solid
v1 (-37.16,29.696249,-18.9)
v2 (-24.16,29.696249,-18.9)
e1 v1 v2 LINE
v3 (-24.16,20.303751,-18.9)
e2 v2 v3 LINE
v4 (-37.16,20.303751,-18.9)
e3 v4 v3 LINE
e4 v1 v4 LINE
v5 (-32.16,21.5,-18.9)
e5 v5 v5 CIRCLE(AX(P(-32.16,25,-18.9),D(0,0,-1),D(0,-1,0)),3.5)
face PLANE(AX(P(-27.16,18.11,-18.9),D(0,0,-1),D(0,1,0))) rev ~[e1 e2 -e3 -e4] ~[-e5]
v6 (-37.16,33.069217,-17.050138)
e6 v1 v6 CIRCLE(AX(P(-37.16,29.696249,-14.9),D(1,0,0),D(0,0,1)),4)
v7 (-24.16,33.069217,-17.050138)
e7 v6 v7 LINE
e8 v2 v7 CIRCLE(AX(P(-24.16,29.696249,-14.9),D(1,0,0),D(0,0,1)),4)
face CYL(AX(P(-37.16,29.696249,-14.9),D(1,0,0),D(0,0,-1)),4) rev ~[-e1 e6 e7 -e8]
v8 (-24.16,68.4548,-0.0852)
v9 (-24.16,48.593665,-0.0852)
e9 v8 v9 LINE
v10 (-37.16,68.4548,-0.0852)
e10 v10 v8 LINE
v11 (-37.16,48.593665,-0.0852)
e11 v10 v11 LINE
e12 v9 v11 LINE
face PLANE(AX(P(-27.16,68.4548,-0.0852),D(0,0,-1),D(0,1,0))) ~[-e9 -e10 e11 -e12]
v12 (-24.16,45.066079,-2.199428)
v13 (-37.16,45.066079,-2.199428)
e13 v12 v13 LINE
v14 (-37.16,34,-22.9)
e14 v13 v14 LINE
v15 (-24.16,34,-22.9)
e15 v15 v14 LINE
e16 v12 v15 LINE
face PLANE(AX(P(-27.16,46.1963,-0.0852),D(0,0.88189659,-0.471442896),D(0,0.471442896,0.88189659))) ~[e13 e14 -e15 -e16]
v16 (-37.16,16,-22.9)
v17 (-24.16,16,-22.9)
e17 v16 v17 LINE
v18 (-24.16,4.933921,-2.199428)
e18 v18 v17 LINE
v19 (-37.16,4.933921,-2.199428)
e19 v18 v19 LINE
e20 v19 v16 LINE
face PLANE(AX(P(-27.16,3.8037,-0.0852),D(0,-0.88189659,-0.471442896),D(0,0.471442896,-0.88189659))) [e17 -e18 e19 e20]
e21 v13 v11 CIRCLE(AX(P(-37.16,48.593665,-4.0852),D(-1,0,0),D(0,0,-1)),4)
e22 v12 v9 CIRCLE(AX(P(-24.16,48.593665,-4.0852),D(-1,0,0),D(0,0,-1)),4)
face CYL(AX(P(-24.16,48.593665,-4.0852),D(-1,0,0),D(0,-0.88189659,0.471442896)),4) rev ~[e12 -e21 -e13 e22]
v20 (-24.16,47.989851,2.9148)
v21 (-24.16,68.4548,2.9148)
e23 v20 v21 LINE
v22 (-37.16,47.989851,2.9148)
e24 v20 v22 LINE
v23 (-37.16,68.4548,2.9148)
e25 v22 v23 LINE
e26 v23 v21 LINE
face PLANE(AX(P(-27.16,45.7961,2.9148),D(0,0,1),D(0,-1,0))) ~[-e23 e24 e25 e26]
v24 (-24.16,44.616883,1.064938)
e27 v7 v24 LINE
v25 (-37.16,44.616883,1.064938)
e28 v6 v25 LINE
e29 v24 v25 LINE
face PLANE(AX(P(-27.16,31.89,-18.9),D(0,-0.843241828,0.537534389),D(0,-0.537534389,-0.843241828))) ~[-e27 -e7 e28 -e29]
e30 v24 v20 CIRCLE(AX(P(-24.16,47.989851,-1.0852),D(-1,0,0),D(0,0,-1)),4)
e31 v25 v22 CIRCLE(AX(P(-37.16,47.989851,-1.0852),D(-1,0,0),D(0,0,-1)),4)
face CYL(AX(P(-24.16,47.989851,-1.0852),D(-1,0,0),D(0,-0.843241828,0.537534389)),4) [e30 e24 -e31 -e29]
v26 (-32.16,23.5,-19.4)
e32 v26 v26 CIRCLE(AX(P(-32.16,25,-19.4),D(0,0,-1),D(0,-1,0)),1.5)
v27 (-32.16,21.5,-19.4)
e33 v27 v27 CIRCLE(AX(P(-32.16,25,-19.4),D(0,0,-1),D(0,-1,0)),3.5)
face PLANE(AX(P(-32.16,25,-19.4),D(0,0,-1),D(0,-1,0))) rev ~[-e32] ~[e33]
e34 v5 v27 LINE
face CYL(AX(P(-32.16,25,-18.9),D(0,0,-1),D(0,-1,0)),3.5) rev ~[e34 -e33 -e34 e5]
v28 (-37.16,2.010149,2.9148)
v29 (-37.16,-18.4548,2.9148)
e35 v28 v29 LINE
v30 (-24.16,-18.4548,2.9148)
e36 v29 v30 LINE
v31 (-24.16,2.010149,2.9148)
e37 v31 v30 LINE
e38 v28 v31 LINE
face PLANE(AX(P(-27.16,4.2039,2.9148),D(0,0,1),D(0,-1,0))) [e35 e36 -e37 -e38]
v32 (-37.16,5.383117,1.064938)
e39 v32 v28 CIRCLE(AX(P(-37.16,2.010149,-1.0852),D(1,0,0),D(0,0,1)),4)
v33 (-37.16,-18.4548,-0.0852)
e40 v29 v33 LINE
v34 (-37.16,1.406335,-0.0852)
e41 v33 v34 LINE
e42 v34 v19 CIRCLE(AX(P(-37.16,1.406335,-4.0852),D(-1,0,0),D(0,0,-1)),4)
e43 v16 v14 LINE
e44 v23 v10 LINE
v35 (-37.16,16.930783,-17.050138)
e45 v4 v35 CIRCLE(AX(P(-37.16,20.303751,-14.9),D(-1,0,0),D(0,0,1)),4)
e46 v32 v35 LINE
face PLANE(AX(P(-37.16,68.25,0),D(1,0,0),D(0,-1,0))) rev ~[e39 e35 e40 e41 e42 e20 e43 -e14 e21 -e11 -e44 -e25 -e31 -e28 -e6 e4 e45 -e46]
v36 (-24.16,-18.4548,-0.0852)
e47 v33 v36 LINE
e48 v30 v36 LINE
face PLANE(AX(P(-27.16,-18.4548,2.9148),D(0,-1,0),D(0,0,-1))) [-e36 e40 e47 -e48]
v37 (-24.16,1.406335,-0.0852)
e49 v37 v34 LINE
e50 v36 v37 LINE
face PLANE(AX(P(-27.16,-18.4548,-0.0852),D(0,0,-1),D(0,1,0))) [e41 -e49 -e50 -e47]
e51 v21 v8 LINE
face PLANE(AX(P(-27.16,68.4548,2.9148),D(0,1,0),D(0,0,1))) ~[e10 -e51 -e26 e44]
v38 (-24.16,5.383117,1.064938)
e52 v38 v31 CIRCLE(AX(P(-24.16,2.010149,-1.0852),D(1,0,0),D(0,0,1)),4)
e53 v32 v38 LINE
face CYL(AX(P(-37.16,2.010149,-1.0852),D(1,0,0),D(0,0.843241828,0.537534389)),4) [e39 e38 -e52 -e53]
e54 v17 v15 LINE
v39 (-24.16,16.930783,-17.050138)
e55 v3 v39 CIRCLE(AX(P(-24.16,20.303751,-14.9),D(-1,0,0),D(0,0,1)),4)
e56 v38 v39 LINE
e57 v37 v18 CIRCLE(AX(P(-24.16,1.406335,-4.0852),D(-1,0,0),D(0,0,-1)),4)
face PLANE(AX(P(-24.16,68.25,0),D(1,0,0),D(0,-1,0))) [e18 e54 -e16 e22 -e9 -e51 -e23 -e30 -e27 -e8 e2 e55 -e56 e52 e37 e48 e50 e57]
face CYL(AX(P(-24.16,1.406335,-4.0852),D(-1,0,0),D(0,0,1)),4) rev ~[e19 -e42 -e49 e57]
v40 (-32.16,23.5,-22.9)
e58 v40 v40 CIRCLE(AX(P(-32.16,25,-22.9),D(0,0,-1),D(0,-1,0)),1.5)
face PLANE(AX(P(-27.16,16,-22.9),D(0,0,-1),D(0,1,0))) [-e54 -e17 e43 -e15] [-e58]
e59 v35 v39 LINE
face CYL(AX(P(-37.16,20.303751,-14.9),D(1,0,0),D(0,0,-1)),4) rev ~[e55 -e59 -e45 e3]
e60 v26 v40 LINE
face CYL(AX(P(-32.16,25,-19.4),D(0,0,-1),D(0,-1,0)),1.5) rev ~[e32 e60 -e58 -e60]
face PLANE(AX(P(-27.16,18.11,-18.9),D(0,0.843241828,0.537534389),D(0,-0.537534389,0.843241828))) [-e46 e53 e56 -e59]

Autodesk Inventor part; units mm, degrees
ref_plane "YZ Plane" through (0, 0, 0) normal (1, 0, 0) x (0, 1, 0)
ref_plane "XZ Plane" through (0, 0, 0) normal (0, 1, 0) x (-1, 0, 0)
ref_plane "XY Plane" through (0, 0, 0) normal (0, 0, 1) x (1, 0, 0)
ref_plane "Work Plane1" through (0, 0, 0) normal (0, 0, 1) x (1, 0, 0)
sketch "Sketch1" plane through (0, 0, 0) normal (0, 0, 1) x (1, 0, 0)
  circle A0 centre (-32.16, 25) radius 1.5 projected
  line L0 (-46.16, -18.25) -> (4.84, -18.25) projected
  line L1 (4.84, -18.25) -> (4.84, 0.75) projected
  line L2 (4.84, 0.75) -> (-46.16, 0.75) projected
  line L3 (-46.16, -18.25) -> (-46.16, 0.75) projected
  line L4 (4.84, 68.25) -> (-46.16, 68.25) projected
  line L5 (-46.16, 68.25) -> (-46.16, 49.25) projected
  line L6 (-46.16, 49.25) -> (4.84, 49.25) projected
  line L7 (4.84, 68.25) -> (4.84, 49.25) projected
  line L8 (-37.16, 68.25) -> (-27.16, 68.25)
  line L9 (-27.16, 68.25) -> (-27.16, -18.25)
  line L10 (-27.16, -18.25) -> (-37.16, -18.25)
  line L11 (-37.16, -18.25) -> (-37.16, 68.25)
  line L12 (-37.16, 68.25) -> (-27.16, -18.25) construction
  line L13 (-27.16, 68.25) -> (-37.16, -18.25) construction
  point P0 (0, 0)
  dimension "d0" = 10
ref_plane "Work Plane3" through (-27.16, 68.25, 0) normal (1, 0, 0) x (0, -1, 0)
ref_plane "Work Plane2" through (4.84, 54, -29.8) normal (1, 0, 0) x (0, -1, 0)
sketch "Sketch2" plane through (-27.16, 68.25, 0) normal (1, 0, 0) x (0, -1, 0)
  line L0 (58.4964, 22.9) -> (28.0036, 22.9) projected
  line L1 (65, 22.8) -> (65, 15.8) projected
  line L2 (86.7048, 0.0852) -> (64.4463, 0.0852)
  line L3 (64.4463, 0.0852) -> (64.4463, -2.9148)
  line L4 (64.4463, -2.9148) -> (86.7048, -2.9148)
  line L5 (86.7048, -2.9148) -> (86.7048, 0.0852)
  line L6 (43.25, 22.9) -> (52.25, 22.9)
  line L7 (52.25, 22.9) -> (52.25, 18.9)
  line L8 (52.25, 18.9) -> (43.25, 18.9)
  line L9 (43.25, 18.9) -> (43.25, 22.9)
  line L10 (64.4463, 0.0852) -> (52.25, 22.9)
  line L11 (50.14, 18.9) -> (64.0461, -2.9148)
  line L12 (64.0461, -2.9148) -> (64.4463, -2.9148)
  point P0 (68.25, 0)
  dimension "d1" = 3
  dimension "d2" = 9
  dimension "d3" = 4
extrude "Extrusion1" add sketch "Sketch2" against normal blind 10
mirror "Mirror1" about plane through (-27.16, 25, -18.9) normal (0, 1, 0) of "Extrusion1"
sketch "Sketch3" plane through (-37.16, 18.11, -18.9) normal (0, 0, 1) x (1, 0, 0)
  circle A0 centre (5, 6.89) radius 1.5 projected
  point P0 (37.16, -18.11)
hole "Hole1" at (-32.16, 25, -18.9) direction (0, 0, -1) diameter 3 end through all counterbore diameter 7 counterbore depth 0.5
move faces "Move1" translate (3, 0, 0) faces at (-27.16, 37.3621, -13.9617)
fillet "Fillet1" radius 4 6 edges at (-30.66, 31.89, -18.9) (-30.66, 18.11, -18.9) (-30.66, 3.8037, -0.0852) (-30.66, 46.1963, -0.0852) (-30.66, 45.7961, 2.9148) (-30.66, 4.2039, 2.9148)
properties part number "servo_bracket_holder"
